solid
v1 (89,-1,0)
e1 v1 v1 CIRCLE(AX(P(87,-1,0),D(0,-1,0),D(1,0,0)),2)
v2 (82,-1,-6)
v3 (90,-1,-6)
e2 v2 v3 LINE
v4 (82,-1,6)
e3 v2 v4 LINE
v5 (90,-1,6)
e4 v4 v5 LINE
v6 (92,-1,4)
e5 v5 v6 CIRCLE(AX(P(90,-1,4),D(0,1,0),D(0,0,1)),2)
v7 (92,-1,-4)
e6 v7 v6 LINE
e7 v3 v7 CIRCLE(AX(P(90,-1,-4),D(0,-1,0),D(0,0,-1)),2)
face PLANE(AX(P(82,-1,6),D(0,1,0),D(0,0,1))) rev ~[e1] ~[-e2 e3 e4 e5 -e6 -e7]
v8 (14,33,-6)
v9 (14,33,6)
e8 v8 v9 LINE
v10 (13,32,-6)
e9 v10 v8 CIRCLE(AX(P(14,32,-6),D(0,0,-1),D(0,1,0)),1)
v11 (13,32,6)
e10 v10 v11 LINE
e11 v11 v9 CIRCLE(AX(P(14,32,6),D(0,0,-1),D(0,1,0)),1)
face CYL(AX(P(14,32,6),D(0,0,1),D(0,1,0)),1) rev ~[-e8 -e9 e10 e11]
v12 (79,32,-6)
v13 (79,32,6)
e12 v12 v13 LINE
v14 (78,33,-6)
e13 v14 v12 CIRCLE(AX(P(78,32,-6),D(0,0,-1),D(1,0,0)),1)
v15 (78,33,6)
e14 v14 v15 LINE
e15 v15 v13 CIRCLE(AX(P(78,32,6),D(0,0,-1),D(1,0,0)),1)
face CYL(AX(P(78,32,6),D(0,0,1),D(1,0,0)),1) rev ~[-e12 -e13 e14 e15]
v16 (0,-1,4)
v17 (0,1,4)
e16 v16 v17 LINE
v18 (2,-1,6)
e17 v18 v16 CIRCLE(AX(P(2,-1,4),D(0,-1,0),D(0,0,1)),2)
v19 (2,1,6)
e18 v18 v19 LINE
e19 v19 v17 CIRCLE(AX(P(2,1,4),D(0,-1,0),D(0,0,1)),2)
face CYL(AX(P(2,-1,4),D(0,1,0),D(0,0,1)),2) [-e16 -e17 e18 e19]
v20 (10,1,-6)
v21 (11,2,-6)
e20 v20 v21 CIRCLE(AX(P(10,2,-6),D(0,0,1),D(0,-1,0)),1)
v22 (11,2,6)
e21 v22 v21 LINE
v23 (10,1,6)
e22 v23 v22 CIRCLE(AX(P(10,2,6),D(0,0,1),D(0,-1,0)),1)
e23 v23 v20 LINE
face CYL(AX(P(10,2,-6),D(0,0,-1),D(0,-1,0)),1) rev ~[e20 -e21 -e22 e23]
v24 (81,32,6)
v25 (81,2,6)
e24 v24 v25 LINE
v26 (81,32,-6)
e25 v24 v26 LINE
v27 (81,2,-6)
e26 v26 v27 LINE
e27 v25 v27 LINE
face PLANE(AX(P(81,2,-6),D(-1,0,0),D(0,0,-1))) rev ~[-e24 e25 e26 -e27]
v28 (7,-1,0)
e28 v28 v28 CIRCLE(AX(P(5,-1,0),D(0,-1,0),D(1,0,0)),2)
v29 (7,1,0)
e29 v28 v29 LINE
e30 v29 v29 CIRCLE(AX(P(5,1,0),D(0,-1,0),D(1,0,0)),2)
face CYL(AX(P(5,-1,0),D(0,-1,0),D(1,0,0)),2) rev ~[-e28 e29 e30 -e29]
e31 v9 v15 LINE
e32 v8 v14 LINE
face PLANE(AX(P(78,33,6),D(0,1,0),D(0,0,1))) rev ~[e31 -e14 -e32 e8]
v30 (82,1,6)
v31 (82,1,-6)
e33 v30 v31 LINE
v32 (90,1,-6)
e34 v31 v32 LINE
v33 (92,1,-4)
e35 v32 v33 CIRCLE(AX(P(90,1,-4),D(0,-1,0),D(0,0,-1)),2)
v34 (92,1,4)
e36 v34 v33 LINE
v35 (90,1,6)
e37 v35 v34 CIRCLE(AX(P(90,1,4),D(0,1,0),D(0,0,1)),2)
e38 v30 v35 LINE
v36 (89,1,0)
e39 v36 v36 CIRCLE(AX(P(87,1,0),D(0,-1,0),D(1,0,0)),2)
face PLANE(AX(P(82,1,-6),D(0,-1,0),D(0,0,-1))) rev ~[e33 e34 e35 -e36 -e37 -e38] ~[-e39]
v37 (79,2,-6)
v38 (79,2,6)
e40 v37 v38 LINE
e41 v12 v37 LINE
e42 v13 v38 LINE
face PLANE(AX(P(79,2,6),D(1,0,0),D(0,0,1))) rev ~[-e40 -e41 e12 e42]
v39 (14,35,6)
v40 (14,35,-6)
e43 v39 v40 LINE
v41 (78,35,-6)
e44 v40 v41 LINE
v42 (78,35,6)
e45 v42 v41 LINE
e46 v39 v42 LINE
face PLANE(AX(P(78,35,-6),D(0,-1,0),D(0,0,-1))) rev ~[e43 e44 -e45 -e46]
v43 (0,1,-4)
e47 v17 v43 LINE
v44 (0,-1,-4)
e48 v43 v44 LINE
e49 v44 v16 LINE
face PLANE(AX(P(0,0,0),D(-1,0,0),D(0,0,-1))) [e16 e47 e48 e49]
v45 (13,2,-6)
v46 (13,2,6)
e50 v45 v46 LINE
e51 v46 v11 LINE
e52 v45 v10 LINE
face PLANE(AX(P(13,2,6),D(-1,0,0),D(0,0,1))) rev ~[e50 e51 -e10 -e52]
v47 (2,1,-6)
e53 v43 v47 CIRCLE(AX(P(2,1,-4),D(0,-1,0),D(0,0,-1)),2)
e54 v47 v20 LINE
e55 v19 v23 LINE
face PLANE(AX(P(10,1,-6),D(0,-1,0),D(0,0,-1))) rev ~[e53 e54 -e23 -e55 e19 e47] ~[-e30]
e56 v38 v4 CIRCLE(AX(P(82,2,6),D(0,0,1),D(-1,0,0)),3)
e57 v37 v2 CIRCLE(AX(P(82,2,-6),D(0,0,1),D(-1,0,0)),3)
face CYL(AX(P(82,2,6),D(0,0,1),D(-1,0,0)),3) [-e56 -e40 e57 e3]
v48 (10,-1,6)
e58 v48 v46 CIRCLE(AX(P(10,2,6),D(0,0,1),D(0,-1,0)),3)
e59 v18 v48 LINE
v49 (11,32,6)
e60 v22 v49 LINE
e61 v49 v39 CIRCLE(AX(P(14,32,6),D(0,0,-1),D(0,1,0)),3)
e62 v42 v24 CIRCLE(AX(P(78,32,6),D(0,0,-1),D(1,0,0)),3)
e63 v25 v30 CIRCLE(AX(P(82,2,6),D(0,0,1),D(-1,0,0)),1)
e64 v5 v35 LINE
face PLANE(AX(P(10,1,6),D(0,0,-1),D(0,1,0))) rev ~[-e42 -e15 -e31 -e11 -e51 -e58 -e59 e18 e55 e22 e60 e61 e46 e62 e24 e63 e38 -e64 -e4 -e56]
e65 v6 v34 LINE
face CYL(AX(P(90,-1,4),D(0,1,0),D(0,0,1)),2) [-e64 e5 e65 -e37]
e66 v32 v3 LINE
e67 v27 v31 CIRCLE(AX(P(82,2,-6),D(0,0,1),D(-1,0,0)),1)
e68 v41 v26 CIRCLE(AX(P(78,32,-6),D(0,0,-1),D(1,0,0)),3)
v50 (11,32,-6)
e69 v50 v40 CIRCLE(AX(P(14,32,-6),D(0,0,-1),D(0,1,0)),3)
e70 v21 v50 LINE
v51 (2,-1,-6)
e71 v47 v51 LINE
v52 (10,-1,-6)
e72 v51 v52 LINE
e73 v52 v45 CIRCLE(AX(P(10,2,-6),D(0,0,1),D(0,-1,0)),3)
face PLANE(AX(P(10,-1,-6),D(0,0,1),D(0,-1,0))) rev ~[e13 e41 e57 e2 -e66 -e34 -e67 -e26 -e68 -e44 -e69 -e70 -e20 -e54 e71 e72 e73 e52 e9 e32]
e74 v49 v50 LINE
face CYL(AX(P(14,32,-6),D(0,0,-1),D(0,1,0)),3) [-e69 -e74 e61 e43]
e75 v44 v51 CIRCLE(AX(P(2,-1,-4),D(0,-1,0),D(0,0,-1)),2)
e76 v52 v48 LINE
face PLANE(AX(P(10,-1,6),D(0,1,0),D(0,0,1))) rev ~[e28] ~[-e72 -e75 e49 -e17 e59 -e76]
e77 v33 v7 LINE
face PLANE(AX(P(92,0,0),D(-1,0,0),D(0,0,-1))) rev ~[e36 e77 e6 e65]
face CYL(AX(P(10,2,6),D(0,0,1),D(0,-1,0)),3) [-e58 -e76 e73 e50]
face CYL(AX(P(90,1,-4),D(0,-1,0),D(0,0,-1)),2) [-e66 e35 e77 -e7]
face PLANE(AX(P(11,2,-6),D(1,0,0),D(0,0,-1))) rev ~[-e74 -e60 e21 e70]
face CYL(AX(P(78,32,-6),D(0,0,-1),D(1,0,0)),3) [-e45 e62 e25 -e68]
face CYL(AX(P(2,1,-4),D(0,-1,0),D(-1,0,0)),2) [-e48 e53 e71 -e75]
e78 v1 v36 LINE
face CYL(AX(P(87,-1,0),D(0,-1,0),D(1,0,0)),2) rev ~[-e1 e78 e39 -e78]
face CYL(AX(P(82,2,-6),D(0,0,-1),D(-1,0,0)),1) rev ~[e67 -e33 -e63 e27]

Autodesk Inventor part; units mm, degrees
ref_plane "YZ Plane" through (0, 0, 0) normal (1, 0, 0) x (0, 1, 0)
ref_plane "XZ Plane" through (0, 0, 0) normal (0, 1, 0) x (-1, 0, 0)
sketch "Skizze1" plane through (0, 0, 0) normal (0, 0, 1) x (1, 0, 0)
  line L0 (12, 2) -> (12, 32)
  line L1 (80, 2) -> (80, 32)
  arc A0 (14, 34) -> (12, 32) centre (14, 32) ccw
  arc A1 (80, 32) -> (78, 34) centre (78, 32) ccw
  line L2 (10, 0) -> (0, 0)
  line L3 (82, 0) -> (92, 0)
  arc A2 (80, 2) -> (82, 0) centre (82, 2) ccw
  arc A3 (10, 0) -> (12, 2) centre (10, 2) ccw
  line L4 (78, 34) -> (14, 34)
  dimension "d1" = 30
  dimension "d2" = 30
  dimension "d3" = 2
  dimension "d7" = 2
  dimension "d29" = 2
  dimension "d30" = 2
  dimension "d31" = 92
  dimension "d32" = 10
  dimension "d33" = 10
ref_plane "Arbeitsebene1" through (0, 0, 0) normal (-1, 0, 0) x (0, -1, 0)
sketch "Skizze2" plane through (0, 0, 0) normal (-1, 0, 0) x (0, -1, 0)
  line L0 (-1, 6) -> (1, 6)
  line L1 (1, 6) -> (1, -6)
  line L2 (1, -6) -> (-1, -6)
  line L3 (-1, -6) -> (-1, 6)
  point P0 (0, 0)
  point P1 (1, 0)
  dimension "d15" = 12
  dimension "d16" = 6
  dimension "d17" = 1
  dimension "d18" = 2
sweep "Sweeping1" add profiles "Skizze2" path "Skizze1"
sketch "Skizze4" plane through (0, -1, 6) normal (0, -1, 0) x (1, 0, 0)
  circle A0 centre (5, -6) radius 2
  circle A1 centre (87, -6) radius 2
  line L0 (0, -12) -> (0, 0) projected
  line L1 (92, -12) -> (92, 0) projected
  line L2 (92, 0) -> (82, 0) projected
  point P0 (0, -6)
  dimension "d37" = 4
  dimension "d38" = 4
  dimension "d39" = 5
  dimension "d40" = 5
  dimension "d41" = 6
extrude "Extrusion2" cut sketch "Skizze4" against normal blind 4
fillet "Rundung1" radius 2 4 edges at (92, 0, -6) (92, 0, 6) (0, 0, -6) (0, 0, 6)
equation "\"d1\" = d2"
equation "\"d3\" = d4"
equation "\"d7\" = d4"
equation "\"d4\" = 2"
properties part number "Handle"
